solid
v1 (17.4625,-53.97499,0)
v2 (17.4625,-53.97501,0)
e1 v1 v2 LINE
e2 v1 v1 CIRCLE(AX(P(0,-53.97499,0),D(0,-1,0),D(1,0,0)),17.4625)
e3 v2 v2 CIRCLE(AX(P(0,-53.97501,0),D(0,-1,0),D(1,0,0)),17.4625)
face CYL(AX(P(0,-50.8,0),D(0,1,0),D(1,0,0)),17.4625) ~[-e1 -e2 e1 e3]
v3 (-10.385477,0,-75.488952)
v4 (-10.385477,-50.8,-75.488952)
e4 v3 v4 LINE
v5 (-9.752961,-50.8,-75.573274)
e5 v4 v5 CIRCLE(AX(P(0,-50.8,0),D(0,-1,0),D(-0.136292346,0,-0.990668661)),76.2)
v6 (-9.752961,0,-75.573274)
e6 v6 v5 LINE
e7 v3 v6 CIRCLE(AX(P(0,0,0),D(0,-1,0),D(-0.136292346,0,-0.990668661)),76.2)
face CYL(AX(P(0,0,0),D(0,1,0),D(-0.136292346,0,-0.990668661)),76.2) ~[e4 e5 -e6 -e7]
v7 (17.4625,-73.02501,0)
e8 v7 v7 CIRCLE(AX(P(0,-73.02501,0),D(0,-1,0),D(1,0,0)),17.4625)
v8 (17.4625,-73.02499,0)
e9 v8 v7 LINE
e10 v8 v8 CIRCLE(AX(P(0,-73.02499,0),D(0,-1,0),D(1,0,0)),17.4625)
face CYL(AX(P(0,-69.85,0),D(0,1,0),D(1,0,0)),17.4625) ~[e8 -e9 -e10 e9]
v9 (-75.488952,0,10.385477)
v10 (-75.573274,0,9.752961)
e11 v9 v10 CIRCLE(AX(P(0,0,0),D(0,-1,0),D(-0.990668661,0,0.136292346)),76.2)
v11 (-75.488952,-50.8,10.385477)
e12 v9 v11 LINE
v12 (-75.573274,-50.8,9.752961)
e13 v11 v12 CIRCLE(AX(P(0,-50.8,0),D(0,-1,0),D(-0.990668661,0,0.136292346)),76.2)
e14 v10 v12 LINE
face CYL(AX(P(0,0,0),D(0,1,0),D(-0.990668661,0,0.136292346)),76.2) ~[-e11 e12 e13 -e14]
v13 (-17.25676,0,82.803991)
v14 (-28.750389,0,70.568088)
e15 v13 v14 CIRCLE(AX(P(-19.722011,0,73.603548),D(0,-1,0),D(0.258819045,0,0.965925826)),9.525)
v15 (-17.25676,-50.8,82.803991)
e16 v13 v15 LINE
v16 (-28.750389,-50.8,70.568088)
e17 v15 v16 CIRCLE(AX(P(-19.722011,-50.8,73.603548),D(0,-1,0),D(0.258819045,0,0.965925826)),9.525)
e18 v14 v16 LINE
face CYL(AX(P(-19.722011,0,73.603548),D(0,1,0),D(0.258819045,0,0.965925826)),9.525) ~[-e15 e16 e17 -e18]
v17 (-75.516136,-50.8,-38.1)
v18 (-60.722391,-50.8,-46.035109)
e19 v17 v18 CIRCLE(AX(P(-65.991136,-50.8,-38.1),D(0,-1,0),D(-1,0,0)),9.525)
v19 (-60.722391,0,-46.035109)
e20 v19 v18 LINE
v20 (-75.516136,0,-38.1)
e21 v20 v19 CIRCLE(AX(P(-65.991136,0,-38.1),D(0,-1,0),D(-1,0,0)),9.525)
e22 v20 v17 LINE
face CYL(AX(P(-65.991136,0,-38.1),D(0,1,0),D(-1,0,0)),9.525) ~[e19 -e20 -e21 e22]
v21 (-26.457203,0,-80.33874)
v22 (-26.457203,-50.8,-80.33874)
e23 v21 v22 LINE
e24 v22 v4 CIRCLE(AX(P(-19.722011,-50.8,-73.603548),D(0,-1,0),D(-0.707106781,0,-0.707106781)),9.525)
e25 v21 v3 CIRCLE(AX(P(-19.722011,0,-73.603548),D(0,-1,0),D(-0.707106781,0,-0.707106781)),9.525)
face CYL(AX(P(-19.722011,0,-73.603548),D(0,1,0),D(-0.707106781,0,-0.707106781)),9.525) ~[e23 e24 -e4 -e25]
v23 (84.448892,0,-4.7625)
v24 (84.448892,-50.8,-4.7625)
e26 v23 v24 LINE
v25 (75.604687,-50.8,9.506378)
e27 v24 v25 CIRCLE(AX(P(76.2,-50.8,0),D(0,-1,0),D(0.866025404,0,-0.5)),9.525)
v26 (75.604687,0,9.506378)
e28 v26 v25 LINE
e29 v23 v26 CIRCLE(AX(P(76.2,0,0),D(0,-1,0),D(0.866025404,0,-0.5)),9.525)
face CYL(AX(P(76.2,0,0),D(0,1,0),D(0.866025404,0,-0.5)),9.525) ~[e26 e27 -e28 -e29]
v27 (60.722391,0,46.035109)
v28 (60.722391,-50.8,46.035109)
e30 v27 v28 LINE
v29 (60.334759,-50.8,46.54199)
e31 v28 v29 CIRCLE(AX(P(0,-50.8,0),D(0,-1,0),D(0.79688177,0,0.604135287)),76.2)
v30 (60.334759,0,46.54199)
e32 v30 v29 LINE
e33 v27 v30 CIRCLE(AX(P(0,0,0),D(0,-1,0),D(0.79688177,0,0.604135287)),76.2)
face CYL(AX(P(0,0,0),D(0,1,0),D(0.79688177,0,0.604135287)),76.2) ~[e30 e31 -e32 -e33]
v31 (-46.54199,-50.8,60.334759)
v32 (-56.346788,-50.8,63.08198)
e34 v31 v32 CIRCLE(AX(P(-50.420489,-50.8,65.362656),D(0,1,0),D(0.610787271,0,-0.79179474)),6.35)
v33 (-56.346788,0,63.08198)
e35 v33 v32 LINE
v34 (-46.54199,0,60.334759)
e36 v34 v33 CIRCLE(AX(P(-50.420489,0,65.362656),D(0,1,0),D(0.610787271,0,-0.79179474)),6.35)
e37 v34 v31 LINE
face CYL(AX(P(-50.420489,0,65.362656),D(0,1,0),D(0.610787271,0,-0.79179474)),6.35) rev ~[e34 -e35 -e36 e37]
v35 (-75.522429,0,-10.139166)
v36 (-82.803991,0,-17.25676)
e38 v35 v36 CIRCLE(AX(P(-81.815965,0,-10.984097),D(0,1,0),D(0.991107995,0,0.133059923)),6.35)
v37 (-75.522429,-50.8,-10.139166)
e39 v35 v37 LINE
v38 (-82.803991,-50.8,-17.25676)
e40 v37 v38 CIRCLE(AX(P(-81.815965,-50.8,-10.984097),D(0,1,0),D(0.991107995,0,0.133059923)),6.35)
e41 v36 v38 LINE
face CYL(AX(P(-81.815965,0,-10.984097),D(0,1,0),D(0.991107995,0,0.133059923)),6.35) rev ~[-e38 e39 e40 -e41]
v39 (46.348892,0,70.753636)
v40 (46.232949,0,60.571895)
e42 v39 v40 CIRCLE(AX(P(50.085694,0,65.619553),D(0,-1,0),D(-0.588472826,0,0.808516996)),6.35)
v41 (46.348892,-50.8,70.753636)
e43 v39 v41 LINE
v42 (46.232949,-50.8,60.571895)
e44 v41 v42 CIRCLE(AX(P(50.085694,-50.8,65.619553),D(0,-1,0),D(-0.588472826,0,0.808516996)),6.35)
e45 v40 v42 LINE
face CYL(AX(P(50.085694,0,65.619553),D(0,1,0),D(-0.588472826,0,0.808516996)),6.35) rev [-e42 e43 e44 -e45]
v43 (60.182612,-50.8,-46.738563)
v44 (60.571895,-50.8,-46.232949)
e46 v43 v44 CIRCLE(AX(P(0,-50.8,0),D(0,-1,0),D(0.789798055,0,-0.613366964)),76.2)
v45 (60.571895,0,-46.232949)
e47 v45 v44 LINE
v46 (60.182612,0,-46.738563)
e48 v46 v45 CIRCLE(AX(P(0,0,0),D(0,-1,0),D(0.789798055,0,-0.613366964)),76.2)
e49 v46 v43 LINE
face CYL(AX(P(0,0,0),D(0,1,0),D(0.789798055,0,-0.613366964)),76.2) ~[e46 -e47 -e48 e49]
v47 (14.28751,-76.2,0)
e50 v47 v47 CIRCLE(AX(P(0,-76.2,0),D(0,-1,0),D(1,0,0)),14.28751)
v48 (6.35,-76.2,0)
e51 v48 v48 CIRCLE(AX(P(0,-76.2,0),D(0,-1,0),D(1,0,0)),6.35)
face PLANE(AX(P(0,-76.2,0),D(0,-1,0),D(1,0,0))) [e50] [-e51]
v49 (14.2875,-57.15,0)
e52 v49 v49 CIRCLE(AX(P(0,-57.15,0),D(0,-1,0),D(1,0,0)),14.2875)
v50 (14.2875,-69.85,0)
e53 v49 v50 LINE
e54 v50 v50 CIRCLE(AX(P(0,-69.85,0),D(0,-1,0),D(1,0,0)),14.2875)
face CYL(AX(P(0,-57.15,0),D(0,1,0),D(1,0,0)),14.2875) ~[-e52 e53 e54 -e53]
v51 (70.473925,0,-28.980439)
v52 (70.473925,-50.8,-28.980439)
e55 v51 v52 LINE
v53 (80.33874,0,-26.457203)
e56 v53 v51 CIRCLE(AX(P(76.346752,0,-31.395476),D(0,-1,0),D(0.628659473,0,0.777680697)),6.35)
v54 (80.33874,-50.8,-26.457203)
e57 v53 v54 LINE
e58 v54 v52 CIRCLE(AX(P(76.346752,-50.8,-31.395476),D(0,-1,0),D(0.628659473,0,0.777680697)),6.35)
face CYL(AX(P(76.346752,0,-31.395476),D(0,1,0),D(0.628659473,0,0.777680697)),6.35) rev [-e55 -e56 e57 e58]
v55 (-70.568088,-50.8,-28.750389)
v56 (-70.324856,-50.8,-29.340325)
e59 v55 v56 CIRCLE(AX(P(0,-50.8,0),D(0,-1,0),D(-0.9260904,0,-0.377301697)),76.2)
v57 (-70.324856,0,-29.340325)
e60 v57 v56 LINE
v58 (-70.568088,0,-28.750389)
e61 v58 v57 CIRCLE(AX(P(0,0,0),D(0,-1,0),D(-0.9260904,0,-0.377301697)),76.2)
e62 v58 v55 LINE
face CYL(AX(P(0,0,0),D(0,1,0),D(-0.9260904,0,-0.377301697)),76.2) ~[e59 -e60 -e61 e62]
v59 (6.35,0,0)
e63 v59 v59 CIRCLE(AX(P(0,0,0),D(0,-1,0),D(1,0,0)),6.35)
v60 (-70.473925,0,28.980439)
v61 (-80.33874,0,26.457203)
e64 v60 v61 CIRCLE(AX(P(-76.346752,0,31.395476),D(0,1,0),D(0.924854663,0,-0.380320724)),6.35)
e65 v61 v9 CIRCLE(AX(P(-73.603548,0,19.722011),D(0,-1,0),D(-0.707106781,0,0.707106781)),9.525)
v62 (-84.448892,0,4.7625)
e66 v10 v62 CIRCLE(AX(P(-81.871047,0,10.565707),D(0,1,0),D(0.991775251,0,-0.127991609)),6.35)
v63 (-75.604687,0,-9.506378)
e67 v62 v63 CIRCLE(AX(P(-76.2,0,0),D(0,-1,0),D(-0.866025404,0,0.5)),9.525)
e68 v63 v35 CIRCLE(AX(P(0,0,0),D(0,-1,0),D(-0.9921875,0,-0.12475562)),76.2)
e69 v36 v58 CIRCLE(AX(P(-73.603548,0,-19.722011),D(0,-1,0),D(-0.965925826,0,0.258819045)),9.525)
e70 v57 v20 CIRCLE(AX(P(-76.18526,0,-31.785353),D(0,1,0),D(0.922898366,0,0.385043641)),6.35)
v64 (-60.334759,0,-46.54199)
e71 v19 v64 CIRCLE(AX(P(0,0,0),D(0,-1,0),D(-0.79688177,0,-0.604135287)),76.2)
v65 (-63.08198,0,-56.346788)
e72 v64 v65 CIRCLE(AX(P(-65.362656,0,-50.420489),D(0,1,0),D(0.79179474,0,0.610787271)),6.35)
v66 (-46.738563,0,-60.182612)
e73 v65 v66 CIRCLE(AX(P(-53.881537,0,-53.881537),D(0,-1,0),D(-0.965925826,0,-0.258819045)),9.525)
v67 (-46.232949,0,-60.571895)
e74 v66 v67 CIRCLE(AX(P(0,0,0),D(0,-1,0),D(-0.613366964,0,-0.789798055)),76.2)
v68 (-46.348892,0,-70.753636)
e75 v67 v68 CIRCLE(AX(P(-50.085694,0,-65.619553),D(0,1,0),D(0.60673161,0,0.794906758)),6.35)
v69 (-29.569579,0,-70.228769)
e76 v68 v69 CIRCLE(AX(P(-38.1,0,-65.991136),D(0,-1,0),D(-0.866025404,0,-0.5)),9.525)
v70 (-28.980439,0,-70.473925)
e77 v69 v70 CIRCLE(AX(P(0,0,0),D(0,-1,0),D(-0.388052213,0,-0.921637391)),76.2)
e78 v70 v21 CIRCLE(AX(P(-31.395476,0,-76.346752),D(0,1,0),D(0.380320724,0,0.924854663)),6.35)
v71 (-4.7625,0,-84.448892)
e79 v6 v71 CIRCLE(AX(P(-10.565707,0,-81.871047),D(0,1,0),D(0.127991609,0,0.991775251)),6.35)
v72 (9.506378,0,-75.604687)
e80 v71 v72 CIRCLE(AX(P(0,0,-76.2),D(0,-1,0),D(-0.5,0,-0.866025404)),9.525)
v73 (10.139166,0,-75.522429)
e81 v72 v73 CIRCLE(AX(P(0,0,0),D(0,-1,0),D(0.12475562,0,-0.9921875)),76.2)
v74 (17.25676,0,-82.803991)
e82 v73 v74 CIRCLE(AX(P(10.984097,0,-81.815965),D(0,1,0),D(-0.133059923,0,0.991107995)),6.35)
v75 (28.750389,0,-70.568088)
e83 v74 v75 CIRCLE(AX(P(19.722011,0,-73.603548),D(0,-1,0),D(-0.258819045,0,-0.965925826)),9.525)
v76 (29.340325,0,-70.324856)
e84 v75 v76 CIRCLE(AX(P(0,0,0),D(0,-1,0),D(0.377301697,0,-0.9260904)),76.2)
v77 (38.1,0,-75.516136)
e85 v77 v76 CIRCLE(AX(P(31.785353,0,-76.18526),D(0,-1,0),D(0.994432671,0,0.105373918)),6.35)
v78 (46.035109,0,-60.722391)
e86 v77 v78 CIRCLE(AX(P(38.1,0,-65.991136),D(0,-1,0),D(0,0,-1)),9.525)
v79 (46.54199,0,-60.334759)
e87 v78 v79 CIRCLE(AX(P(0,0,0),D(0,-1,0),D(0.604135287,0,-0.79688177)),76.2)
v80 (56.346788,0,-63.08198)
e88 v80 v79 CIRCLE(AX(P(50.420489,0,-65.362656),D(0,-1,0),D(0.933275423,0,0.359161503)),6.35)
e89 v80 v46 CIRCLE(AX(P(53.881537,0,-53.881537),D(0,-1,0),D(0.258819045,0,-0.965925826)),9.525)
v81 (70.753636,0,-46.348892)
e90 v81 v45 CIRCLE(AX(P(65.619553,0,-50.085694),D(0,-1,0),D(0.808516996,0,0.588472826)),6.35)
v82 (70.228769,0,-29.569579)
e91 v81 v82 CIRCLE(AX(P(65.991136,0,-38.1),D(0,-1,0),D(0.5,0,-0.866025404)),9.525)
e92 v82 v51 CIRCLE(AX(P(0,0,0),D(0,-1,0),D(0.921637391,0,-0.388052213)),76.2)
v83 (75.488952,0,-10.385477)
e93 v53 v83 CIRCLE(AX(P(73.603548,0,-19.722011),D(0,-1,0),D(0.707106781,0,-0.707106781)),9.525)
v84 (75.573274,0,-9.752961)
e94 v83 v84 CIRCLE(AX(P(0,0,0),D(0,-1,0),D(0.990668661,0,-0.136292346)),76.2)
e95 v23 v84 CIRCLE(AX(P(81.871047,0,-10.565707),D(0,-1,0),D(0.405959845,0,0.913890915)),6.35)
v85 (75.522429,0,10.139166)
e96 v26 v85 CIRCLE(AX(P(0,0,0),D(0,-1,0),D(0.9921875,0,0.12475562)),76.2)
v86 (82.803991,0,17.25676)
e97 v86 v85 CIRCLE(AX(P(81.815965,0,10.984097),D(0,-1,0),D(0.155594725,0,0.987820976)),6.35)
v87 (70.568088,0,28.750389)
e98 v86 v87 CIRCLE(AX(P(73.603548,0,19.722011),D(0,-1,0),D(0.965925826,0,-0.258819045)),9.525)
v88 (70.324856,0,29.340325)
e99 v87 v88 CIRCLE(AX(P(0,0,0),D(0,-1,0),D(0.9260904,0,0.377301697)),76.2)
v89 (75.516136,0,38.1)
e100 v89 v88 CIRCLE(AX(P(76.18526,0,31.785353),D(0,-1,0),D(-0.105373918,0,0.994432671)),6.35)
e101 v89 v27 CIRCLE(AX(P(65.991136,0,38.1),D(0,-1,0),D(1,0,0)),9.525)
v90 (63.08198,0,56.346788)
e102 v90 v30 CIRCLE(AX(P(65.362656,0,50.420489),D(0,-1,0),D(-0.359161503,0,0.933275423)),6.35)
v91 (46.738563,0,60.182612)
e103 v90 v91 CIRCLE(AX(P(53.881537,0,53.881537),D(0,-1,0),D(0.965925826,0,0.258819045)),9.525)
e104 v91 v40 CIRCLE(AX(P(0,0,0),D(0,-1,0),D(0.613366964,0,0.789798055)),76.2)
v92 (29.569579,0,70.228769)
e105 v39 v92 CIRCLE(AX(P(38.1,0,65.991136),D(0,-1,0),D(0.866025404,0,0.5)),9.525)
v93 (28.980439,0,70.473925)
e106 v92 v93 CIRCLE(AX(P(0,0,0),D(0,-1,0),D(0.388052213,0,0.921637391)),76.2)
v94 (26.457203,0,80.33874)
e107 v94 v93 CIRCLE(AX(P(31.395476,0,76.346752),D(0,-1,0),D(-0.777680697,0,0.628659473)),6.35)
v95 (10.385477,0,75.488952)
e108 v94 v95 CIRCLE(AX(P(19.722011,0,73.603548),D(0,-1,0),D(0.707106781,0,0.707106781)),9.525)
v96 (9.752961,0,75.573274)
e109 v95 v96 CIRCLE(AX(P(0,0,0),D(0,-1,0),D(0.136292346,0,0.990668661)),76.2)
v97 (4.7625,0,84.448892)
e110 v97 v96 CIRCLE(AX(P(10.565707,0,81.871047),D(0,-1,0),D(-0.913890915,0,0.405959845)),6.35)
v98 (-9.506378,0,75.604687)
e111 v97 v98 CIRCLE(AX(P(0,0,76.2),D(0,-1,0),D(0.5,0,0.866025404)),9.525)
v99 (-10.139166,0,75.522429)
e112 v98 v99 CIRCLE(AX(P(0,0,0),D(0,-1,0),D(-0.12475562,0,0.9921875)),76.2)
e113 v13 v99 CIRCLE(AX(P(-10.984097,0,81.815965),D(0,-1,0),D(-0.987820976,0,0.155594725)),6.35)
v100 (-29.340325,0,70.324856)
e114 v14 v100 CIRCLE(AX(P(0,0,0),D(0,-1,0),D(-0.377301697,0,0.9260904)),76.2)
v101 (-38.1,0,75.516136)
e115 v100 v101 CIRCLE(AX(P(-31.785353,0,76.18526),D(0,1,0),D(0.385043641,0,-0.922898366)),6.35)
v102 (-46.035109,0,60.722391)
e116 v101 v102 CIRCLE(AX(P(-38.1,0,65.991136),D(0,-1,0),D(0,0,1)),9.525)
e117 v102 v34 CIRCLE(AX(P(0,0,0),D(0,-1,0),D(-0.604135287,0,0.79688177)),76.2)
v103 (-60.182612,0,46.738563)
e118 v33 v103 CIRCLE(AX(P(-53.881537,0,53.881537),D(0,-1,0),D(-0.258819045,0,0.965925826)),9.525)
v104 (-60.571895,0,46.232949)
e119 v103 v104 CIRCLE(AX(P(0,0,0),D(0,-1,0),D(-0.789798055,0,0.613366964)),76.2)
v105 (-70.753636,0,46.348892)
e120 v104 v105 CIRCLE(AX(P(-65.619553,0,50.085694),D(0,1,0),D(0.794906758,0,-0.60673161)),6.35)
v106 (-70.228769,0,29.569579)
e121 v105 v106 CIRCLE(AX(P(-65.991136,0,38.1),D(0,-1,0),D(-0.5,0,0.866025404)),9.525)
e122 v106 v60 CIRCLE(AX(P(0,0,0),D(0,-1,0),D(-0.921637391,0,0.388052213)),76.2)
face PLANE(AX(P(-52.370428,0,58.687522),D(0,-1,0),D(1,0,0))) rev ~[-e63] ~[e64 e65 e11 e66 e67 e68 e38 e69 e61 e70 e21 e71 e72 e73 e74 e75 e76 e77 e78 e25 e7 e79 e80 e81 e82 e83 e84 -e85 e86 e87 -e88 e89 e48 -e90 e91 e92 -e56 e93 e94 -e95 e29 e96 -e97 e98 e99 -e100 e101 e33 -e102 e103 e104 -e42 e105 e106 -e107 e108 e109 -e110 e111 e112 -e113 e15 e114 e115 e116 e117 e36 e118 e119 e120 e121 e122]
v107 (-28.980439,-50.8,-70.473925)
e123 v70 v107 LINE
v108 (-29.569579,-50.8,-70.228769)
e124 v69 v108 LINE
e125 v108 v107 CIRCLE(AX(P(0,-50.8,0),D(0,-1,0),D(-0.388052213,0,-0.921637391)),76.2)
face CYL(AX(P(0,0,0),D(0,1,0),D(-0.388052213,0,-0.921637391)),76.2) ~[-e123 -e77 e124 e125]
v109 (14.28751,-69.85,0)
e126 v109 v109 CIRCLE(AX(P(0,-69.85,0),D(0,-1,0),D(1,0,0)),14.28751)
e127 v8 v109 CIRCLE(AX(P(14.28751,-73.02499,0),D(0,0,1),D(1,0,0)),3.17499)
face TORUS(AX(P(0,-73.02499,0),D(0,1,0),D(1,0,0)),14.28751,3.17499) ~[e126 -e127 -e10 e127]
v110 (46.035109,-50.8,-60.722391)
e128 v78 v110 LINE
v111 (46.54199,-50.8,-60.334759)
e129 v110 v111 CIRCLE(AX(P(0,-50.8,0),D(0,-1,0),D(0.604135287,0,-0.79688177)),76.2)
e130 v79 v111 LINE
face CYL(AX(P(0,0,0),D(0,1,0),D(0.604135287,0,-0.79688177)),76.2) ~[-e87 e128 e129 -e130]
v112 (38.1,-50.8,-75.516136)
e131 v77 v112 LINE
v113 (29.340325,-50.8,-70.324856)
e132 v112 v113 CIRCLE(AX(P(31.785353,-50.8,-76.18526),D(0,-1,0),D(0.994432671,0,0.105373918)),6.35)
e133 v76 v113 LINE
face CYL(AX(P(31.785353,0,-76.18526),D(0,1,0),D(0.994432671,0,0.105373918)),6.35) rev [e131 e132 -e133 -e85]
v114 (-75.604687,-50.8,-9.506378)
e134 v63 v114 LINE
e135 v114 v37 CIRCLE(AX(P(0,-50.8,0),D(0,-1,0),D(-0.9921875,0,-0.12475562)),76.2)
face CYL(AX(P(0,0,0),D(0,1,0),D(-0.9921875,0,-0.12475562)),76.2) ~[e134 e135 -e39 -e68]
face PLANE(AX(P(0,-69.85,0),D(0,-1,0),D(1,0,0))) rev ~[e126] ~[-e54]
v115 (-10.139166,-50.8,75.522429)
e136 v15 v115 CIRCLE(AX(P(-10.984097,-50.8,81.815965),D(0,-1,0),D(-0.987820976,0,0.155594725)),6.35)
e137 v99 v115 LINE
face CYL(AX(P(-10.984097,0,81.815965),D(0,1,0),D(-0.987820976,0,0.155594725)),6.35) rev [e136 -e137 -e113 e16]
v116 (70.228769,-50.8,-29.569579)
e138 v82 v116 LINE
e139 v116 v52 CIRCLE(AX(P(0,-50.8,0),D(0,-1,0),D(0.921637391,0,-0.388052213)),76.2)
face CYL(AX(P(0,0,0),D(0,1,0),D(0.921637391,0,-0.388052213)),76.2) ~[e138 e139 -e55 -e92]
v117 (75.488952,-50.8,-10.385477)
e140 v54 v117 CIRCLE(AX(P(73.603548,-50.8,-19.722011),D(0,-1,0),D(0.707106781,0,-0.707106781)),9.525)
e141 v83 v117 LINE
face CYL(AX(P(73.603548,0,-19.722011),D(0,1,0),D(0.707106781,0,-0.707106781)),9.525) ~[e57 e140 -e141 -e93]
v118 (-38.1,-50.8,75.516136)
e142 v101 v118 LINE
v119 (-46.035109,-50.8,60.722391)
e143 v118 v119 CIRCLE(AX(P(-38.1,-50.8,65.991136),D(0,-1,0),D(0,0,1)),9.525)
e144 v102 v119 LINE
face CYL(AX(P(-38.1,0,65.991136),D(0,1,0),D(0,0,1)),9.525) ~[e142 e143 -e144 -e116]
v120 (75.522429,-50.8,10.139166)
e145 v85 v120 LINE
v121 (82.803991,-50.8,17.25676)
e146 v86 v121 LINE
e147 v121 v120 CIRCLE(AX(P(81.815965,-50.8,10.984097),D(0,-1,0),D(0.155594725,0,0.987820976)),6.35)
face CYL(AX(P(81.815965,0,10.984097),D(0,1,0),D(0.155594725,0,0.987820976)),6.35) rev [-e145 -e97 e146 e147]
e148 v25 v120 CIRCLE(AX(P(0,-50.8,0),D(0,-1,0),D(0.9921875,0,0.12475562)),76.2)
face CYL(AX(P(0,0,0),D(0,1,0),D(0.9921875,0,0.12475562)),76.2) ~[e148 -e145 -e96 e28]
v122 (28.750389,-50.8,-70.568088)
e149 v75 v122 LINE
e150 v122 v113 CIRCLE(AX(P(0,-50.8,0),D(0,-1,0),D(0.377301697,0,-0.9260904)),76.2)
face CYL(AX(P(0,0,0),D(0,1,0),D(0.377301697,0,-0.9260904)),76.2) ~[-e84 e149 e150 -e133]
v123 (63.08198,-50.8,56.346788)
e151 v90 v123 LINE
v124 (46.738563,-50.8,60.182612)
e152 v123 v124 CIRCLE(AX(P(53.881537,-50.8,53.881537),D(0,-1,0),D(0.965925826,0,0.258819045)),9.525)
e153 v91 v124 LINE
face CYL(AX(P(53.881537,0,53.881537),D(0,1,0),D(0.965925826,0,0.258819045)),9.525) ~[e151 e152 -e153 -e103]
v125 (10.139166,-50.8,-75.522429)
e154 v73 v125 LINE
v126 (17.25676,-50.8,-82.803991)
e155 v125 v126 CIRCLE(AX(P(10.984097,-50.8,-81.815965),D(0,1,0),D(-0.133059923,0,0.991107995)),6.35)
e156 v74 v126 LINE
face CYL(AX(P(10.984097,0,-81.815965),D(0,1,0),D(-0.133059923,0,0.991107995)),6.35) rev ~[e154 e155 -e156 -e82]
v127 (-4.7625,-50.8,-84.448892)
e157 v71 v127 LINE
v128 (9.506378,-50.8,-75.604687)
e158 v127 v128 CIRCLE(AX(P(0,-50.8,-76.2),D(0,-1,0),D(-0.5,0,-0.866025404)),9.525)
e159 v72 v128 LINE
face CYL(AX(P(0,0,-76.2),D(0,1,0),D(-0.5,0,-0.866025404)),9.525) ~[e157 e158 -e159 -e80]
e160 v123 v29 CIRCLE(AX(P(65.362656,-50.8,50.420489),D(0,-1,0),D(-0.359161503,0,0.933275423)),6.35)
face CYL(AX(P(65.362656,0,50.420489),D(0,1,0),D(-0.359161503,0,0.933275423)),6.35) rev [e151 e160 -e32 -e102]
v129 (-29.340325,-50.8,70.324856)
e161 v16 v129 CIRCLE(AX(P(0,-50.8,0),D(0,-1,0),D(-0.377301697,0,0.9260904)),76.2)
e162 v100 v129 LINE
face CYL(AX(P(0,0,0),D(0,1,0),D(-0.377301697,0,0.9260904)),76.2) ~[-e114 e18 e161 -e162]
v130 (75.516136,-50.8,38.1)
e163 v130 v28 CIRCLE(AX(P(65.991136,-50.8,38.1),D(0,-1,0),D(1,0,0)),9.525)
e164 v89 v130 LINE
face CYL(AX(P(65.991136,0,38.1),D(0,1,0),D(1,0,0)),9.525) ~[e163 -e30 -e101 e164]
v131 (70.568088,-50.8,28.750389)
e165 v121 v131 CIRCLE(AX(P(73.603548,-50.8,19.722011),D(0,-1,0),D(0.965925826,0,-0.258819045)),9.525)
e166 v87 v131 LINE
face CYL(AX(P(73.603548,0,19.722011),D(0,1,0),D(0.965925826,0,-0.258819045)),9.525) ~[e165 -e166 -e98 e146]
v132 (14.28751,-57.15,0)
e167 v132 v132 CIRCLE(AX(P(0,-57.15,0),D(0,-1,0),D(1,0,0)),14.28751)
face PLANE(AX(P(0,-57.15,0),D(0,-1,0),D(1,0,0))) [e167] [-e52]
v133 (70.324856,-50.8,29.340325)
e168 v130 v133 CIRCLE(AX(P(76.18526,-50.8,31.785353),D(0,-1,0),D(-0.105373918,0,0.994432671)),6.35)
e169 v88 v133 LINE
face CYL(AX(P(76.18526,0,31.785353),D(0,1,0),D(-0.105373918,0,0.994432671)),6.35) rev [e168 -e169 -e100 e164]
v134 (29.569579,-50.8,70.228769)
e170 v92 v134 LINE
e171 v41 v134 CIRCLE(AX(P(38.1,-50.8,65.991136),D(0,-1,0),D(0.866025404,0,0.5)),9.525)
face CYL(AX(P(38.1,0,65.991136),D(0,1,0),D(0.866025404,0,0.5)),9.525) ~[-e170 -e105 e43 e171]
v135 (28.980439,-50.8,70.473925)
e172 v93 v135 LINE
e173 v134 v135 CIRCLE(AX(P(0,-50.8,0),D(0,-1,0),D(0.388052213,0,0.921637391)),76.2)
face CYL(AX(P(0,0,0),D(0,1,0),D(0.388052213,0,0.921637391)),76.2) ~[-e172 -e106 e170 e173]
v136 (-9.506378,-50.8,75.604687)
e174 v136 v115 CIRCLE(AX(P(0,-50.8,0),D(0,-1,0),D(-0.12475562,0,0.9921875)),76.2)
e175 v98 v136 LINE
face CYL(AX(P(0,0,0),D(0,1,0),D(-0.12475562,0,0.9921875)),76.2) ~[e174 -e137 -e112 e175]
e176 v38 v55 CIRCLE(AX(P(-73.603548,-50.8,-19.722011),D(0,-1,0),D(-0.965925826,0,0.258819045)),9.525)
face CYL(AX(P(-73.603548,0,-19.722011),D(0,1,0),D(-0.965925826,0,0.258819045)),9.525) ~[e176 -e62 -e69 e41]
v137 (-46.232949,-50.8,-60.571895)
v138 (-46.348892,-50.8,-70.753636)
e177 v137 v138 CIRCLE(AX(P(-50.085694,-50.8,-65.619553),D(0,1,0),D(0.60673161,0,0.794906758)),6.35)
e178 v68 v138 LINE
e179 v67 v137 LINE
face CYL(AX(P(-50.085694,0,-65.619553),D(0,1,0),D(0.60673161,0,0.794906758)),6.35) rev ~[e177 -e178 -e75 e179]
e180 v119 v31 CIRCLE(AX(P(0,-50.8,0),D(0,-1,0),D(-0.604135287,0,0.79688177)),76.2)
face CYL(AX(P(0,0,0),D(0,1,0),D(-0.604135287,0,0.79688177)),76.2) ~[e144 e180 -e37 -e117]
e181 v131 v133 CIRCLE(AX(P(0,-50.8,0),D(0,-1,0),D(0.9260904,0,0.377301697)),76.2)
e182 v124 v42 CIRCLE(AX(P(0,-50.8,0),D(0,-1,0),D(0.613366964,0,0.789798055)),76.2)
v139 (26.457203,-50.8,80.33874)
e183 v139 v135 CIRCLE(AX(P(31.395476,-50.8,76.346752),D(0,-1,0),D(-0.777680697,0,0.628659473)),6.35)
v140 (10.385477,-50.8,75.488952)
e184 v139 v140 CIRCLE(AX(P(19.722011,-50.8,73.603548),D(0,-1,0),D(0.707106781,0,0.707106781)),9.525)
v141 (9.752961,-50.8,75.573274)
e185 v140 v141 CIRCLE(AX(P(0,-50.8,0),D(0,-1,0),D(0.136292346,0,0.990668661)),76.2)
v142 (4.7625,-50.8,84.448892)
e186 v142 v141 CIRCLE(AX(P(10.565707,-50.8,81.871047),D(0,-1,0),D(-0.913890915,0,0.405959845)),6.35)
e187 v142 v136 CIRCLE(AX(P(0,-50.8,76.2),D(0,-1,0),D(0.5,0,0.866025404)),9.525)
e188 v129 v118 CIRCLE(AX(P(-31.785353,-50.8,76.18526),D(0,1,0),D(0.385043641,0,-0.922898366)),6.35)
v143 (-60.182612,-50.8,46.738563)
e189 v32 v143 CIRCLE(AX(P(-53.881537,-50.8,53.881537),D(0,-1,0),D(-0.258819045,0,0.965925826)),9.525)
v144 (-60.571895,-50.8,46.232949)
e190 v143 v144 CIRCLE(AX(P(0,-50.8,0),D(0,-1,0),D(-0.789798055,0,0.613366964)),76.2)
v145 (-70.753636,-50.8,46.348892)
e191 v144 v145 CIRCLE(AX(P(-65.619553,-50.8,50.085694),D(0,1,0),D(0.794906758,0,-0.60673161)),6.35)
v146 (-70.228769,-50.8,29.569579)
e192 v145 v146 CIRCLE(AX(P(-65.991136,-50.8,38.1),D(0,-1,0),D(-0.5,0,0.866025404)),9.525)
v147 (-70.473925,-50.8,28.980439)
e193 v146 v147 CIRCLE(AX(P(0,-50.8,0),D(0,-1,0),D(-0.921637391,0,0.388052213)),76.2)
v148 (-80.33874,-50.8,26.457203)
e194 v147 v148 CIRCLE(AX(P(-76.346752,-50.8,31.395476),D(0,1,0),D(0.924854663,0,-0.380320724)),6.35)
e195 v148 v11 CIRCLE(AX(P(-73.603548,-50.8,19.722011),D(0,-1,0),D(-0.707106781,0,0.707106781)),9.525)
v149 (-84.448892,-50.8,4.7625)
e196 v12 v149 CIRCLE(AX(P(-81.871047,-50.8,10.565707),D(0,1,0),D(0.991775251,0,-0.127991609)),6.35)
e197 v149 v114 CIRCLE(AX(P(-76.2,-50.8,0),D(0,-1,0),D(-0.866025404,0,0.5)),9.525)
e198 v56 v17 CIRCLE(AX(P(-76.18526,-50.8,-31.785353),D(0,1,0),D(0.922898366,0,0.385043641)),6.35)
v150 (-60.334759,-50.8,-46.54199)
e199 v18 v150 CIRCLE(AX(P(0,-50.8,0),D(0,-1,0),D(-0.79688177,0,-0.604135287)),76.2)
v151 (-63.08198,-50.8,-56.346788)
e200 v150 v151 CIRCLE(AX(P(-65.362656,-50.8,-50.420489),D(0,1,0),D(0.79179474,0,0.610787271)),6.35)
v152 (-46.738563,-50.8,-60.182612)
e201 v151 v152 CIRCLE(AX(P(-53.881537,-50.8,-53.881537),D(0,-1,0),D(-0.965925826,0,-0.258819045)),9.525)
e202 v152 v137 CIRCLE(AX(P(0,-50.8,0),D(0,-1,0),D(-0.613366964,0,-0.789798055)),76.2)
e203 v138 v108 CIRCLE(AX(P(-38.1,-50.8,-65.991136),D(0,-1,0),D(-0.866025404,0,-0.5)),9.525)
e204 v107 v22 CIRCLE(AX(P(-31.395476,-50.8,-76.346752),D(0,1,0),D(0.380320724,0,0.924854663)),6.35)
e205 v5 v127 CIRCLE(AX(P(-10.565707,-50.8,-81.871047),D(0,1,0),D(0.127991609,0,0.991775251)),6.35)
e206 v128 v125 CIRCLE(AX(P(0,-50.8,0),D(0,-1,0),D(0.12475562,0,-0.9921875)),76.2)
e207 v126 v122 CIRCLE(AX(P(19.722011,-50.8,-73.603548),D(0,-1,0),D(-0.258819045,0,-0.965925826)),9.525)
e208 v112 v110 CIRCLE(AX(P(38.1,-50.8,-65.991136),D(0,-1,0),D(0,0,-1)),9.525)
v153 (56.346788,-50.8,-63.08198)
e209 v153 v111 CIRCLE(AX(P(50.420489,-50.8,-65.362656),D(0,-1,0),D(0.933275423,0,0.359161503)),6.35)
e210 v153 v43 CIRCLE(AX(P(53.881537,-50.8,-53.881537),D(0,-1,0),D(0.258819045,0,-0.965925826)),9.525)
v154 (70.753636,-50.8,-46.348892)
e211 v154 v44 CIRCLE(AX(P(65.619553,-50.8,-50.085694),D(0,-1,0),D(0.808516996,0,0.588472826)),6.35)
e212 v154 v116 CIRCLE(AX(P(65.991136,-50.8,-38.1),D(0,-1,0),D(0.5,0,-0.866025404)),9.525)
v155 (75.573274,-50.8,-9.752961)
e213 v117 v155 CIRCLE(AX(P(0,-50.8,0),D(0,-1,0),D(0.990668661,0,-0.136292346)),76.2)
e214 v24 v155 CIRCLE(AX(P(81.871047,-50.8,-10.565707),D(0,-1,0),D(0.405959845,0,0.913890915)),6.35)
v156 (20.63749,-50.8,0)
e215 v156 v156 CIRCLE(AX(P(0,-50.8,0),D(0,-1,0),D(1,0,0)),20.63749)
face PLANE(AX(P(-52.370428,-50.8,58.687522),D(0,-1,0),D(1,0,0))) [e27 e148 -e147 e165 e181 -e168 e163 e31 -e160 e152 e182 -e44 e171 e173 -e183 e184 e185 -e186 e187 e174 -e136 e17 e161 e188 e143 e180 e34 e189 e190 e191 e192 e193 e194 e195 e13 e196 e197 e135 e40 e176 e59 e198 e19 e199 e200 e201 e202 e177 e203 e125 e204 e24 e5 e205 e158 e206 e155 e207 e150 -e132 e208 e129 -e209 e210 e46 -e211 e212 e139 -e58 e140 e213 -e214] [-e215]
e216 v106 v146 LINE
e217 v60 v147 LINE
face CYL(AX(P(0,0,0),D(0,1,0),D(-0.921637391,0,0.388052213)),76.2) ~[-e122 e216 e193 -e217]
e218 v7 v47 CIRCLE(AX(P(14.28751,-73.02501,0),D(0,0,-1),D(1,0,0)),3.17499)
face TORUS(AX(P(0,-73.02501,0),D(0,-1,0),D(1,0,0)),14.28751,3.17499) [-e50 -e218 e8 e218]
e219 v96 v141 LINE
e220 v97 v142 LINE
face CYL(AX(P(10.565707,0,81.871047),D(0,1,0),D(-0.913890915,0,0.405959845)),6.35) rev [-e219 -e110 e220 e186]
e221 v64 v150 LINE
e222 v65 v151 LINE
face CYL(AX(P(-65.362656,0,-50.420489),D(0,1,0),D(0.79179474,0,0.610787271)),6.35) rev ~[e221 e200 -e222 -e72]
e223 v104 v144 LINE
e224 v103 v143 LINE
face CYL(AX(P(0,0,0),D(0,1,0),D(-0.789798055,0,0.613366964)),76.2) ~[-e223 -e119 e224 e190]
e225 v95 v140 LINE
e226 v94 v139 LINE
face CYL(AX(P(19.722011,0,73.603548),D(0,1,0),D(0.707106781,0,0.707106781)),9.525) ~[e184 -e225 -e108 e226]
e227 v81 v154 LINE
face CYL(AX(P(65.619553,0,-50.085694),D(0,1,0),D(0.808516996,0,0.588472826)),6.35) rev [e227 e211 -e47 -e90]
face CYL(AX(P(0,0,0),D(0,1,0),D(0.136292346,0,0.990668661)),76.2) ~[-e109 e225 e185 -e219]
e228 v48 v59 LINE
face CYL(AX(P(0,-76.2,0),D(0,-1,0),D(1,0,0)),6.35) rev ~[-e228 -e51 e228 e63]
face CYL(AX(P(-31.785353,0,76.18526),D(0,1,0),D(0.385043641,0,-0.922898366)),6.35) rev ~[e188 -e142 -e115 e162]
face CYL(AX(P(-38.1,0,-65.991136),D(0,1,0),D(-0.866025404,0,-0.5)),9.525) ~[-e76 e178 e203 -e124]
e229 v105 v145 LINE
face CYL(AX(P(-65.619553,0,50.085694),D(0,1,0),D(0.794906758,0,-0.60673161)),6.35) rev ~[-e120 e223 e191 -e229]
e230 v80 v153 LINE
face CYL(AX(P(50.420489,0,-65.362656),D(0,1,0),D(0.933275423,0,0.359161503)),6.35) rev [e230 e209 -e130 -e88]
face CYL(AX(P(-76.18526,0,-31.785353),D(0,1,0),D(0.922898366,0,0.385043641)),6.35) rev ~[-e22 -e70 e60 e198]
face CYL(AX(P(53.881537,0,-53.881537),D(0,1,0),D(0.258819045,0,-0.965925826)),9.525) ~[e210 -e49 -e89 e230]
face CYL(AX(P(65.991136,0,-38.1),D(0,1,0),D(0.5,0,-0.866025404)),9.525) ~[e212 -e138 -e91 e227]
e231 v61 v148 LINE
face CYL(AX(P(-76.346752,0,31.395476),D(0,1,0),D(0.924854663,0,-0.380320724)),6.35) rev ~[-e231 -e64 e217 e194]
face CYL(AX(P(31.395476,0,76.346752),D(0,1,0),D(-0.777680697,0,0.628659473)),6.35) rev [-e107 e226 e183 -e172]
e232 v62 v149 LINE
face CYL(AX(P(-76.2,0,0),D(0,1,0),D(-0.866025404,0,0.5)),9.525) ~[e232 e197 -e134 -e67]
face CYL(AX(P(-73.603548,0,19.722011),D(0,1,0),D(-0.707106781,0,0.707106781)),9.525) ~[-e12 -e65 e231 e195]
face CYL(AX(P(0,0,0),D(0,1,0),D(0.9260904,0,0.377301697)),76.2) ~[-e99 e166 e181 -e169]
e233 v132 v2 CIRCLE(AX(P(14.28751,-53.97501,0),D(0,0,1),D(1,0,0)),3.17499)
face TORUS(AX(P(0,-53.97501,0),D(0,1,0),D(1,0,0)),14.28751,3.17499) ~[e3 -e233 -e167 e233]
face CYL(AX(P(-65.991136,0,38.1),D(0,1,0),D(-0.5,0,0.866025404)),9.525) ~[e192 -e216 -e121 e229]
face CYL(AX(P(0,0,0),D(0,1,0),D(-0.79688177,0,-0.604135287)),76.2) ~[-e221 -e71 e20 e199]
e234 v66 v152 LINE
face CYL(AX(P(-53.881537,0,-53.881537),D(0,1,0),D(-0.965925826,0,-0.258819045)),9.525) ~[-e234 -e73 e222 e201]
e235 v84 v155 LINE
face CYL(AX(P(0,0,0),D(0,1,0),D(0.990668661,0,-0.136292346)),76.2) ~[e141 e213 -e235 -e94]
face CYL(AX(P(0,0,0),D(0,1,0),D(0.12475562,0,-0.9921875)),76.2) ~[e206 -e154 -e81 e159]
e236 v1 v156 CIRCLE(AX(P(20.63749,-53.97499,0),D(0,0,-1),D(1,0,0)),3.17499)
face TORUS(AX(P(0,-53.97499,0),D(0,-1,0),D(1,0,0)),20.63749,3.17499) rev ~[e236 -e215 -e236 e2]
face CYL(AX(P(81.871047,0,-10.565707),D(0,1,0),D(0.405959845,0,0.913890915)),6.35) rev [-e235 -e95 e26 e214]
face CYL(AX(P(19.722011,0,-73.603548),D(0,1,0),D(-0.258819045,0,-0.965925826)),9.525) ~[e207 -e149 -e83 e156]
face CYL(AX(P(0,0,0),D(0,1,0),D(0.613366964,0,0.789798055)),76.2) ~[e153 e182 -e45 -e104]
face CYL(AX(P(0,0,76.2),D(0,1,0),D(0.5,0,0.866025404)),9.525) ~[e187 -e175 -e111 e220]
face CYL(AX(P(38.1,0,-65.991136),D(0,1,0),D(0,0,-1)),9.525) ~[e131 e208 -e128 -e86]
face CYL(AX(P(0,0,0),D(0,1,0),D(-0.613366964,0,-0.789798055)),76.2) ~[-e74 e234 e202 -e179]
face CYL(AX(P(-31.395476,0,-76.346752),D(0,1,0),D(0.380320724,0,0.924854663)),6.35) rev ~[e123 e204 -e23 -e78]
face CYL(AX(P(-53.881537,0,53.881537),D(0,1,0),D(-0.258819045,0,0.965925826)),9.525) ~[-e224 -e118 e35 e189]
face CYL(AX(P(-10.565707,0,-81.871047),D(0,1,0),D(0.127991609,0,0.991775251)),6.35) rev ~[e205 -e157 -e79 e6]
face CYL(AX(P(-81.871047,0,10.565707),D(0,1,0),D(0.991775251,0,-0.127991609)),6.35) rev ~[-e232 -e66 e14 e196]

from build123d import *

# Parameters (mm, degrees)
F1_DEPTH     = 50.8
F2_R         = 17.4625
F3_DEPTH     = 6.35
F4_R         = 14.2875
F5_DEPTH     = 12.7
F6_R         = 17.4625
F7_DEPTH     = 6.35
F8_R         = 3.17499
F9_R         = 6.35
F10_DEPTH    = 76.201
F11_T1_DEPTH = 50.8


# Not quite as in the source:
# - a fillet or chamfer that OpenCascade refuses, or shapes differently, is made with other operations: its cross-section is extruded or revolved along the edge and cut away or added
# - a fillet or chamfer is up to 0.001 mm smaller than in the source, because OpenCascade refuses the exact size


with BuildPart() as f1:
    # F0 (on Front) → F1 (new body)
    with BuildSketch(Plane.XZ):
        with BuildLine():
            ThreePointArc((-70.7536357684, 46.348891971), (-75.5114792005, 37.8021981611), (-70.2287691608, 29.5695786604))
            ThreePointArc((-70.2287691608, 29.5695786604), (-72.0845164259, 24.7034914868), (-73.6035479632, 19.7220112368))
            Line((-73.6035479632, 19.7220112368), (-80.338740054, 26.4572033276))
            ThreePointArc((-80.338740054, 26.4572033276), (-82.7224167718, 16.9703105533), (-75.4889519939, 10.3854767276))
            ThreePointArc((-75.4889519939, 10.3854767276), (-76.0220301687, 5.2048947186), (-76.2, 0))
            Line((-76.2, 0), (-84.448891971, 4.7625))
            ThreePointArc((-84.448891971, 4.7625), (-84.2959583455, -5.0180756738), (-75.6046875, -9.5063782813))
            ThreePointArc((-75.6046875, -9.5063782813), (-74.7787681878, -14.6484070232), (-73.6035479632, -19.7220112368))
            Line((-73.6035479632, -19.7220112368), (-82.8039914586, -17.2567598322))
            ThreePointArc((-82.8039914586, -17.2567598322), (-80.1248696635, -26.6644883366), (-70.5680884956, -28.7503893204))
            ThreePointArc((-70.5680884956, -28.7503893204), (-68.4394567327, -33.503444034), (-65.9911357684, -38.1))
            Line((-65.9911357684, -38.1), (-75.5161357684, -38.1))
            ThreePointArc((-75.5161357684, -38.1), (-70.4934035266, -46.4937601844), (-60.7223908795, -46.0351088396))
            ThreePointArc((-60.7223908795, -46.0351088396), (-57.4361094027, -50.075276701), (-53.8815367264, -53.8815367264))
            Line((-53.8815367264, -53.8815367264), (-63.0819802218, -56.346788131))
            ThreePointArc((-63.0819802218, -56.346788131), (-56.0579284352, -63.1545591102), (-46.7385626735, -60.182611768))
            ThreePointArc((-46.7385626735, -60.182611768), (-42.5185861347, -63.234562014), (-38.1, -65.9911357684))
            Line((-38.1, -65.9911357684), (-46.348891971, -70.7536357684))
            ThreePointArc((-46.348891971, -70.7536357684), (-37.8021981611, -75.5114792005), (-29.5695786604, -70.2287691608))
            ThreePointArc((-29.5695786604, -70.2287691608), (-24.7034914868, -72.0845164259), (-19.7220112368, -73.6035479632))
            Line((-19.7220112368, -73.6035479632), (-26.4572033276, -80.338740054))
            ThreePointArc((-26.4572033276, -80.338740054), (-16.9703105533, -82.7224167718), (-10.3854767276, -75.4889519939))
            ThreePointArc((-10.3854767276, -75.4889519939), (-5.2048947186, -76.0220301687), (0, -76.2))
            Line((0, -76.2), (-4.7625, -84.448891971))
            ThreePointArc((-4.7625, -84.448891971), (5.0180756738, -84.2959583455), (9.5063782813, -75.6046875))
            ThreePointArc((9.5063782813, -75.6046875), (14.6484070232, -74.7787681878), (19.7220112368, -73.6035479632))
            Line((19.7220112368, -73.6035479632), (17.2567598322, -82.8039914586))
            ThreePointArc((17.2567598322, -82.8039914586), (26.6644883366, -80.1248696635), (28.7503893204, -70.5680884956))
            ThreePointArc((28.7503893204, -70.5680884956), (33.503444034, -68.4394567327), (38.1, -65.9911357684))
            Line((38.1, -65.9911357684), (38.1, -75.5161357684))
            ThreePointArc((38.1, -75.5161357684), (46.4937601844, -70.4934035266), (46.0351088396, -60.7223908795))
            ThreePointArc((46.0351088396, -60.7223908795), (50.075276701, -57.4361094027), (53.8815367264, -53.8815367264))
            Line((53.8815367264, -53.8815367264), (56.346788131, -63.0819802218))
            ThreePointArc((56.346788131, -63.0819802218), (63.1545591102, -56.0579284352), (60.182611768, -46.7385626735))
            ThreePointArc((60.182611768, -46.7385626735), (63.234562014, -42.5185861347), (65.9911357684, -38.1))
            Line((65.9911357684, -38.1), (70.7536357684, -46.348891971))
            ThreePointArc((70.7536357684, -46.348891971), (75.5114792005, -37.8021981611), (70.2287691608, -29.5695786604))
            ThreePointArc((70.2287691608, -29.5695786604), (72.0845164259, -24.7034914868), (73.6035479632, -19.7220112368))
            Line((73.6035479632, -19.7220112368), (80.338740054, -26.4572033276))
            ThreePointArc((80.338740054, -26.4572033276), (82.7224167718, -16.9703105533), (75.4889519939, -10.3854767276))
            ThreePointArc((75.4889519939, -10.3854767276), (76.0220301687, -5.2048947186), (76.2, 0))
            Line((76.2, 0), (84.448891971, -4.7625))
            ThreePointArc((84.448891971, -4.7625), (84.2959583455, 5.0180756738), (75.6046875, 9.5063782813))
            ThreePointArc((75.6046875, 9.5063782813), (74.7787681878, 14.6484070232), (73.6035479632, 19.7220112368))
            Line((73.6035479632, 19.7220112368), (82.8039914586, 17.2567598322))
            ThreePointArc((82.8039914586, 17.2567598322), (80.1248696635, 26.6644883366), (70.5680884956, 28.7503893204))
            ThreePointArc((70.5680884956, 28.7503893204), (68.4394567327, 33.503444034), (65.9911357684, 38.1))
            Line((65.9911357684, 38.1), (75.5161357684, 38.1))
            ThreePointArc((75.5161357684, 38.1), (70.4934035266, 46.4937601844), (60.7223908795, 46.0351088396))
            ThreePointArc((60.7223908795, 46.0351088396), (57.4361094027, 50.075276701), (53.8815367264, 53.8815367264))
            Line((53.8815367264, 53.8815367264), (63.0819802218, 56.346788131))
            ThreePointArc((63.0819802218, 56.346788131), (56.0579284352, 63.1545591102), (46.7385626735, 60.182611768))
            ThreePointArc((46.7385626735, 60.182611768), (42.5185861347, 63.234562014), (38.1, 65.9911357684))
            Line((38.1, 65.9911357684), (46.348891971, 70.7536357684))
            ThreePointArc((46.348891971, 70.7536357684), (37.8021981611, 75.5114792005), (29.5695786604, 70.2287691608))
            ThreePointArc((29.5695786604, 70.2287691608), (24.7034914868, 72.0845164259), (19.7220112368, 73.6035479632))
            Line((19.7220112368, 73.6035479632), (26.4572033276, 80.338740054))
            ThreePointArc((26.4572033276, 80.338740054), (16.9703105533, 82.7224167718), (10.3854767276, 75.4889519939))
            ThreePointArc((10.3854767276, 75.4889519939), (5.2048947186, 76.0220301687), (0, 76.2))
            Line((0, 76.2), (4.7625, 84.448891971))
            ThreePointArc((4.7625, 84.448891971), (-5.0180756738, 84.2959583455), (-9.5063782813, 75.6046875))
            ThreePointArc((-9.5063782813, 75.6046875), (-14.6484070232, 74.7787681878), (-19.7220112368, 73.6035479632))
            Line((-19.7220112368, 73.6035479632), (-17.2567598322, 82.8039914586))
            ThreePointArc((-17.2567598322, 82.8039914586), (-26.6644883366, 80.1248696635), (-28.7503893204, 70.5680884956))
            ThreePointArc((-28.7503893204, 70.5680884956), (-33.503444034, 68.4394567327), (-38.1, 65.9911357684))
            Line((-38.1, 65.9911357684), (-38.1, 75.5161357684))
            ThreePointArc((-38.1, 75.5161357684), (-46.4937601844, 70.4934035266), (-46.0351088396, 60.7223908795))
            ThreePointArc((-46.0351088396, 60.7223908795), (-50.075276701, 57.4361094027), (-53.8815367264, 53.8815367264))
            Line((-53.8815367264, 53.8815367264), (-56.346788131, 63.0819802218))
            ThreePointArc((-56.346788131, 63.0819802218), (-63.1545591102, 56.0579284352), (-60.182611768, 46.7385626735))
            ThreePointArc((-60.182611768, 46.7385626735), (-63.234562014, 42.5185861347), (-65.9911357684, 38.1))
            Line((-65.9911357684, 38.1), (-70.7536357684, 46.348891971))
        make_face()
    extrude(amount=F1_DEPTH)

    # F2 (on face) → F3 (join)
    with BuildSketch(Plane.XZ.offset(50.8)):
        Circle(F2_R)
    extrude(amount=F3_DEPTH)

    # F4 (on face) → F5 (join)
    with BuildSketch(Plane.XZ.offset(57.15)):
        Circle(F4_R)
    extrude(amount=F5_DEPTH)

    # F6 (on face) → F7 (join)
    with BuildSketch(Plane.XZ.offset(69.85)):
        Circle(F6_R)
    extrude(amount=F7_DEPTH)

    # F8 (radius 3.175 in the source; OpenCascade refuses exactly that, so slightly less here)
    f8_edges = [f1.edges().sort_by_distance(p)[0] for p in [
        (17.4625, -73.025, 0),
        (-17.4625, -69.85, 0),
        (-17.4625, -76.2, 0),
        (17.4625, -53.975, 0),
        (-17.4625, -50.8, 0),
        (-17.4625, -57.15, 0),
    ]]
    fillet(f8_edges, radius=F8_R)

    # F9 (on face) → F10 (cut, through all)
    with BuildSketch(Plane.XZ.offset(76.2)):
        Circle(F9_R)
    extrude(amount=-F10_DEPTH, mode=Mode.SUBTRACT)

    # F11: fillet of radius 6.35 on 24 edges, made by hand

    # F11_s2 → F11_t1 (join)
    with BuildSketch(Plane.XZ):
        with BuildLine():
            ThreePointArc((-46.5419900283, 60.3347591708), (-52.1337249794, 59.2481383586), (-56.346788131, 63.0819802218))
            Line((-56.346788131, 63.0819802218), (-56.4653141097, 63.0363667109))
            ThreePointArc((-56.4653141097, 63.0363667109), (-55.2368350087, 58.4488884554), (-54.0042093064, 53.8486667077))
            Line((-54.0042093064, 53.8486667077), (-53.7917341652, 53.7917341652))
            ThreePointArc((-53.7917341652, 53.7917341652), (-50.2314688194, 57.1305598542), (-46.4644200449, 60.2342012389))
            Line((-46.4644200449, 60.2342012389), (-46.5419900283, 60.3347591708))
        make_face()
        with BuildLine():
            ThreePointArc((-29.3403254202, 70.3248555223), (-35.0227647841, 70.7225079169), (-38.1, 75.5161357684))
            Line((-38.1, 75.5161357684), (-38.2262929492, 75.5027532808))
            ThreePointArc((-38.2262929492, 75.5027532808), (-38.227, 70.7536357684), (-38.227, 65.9911357684))
            Line((-38.227, 65.9911357684), (-38.0365, 65.8811505421))
            ThreePointArc((-38.0365, 65.8811505421), (-33.7333960774, 68.1847440274), (-29.2914248778, 70.2076474298))
            Line((-29.2914248778, 70.2076474298), (-29.3403254202, 70.3248555223))
        make_face()
        with BuildLine():
            ThreePointArc((-17.2567598322, 82.8039914586), (-15.5250610467, 77.3772554351), (-10.1391661218, 75.5224291873))
            Line((-10.1391661218, 75.5224291873), (-10.1222675116, 75.396558472))
            ThreePointArc((-10.1222675116, 75.396558472), (-14.9364481399, 74.5922505758), (-19.6891412181, 73.4808753833))
            Line((-19.6891412181, 73.4808753833), (-19.8446838168, 73.636417982))
            ThreePointArc((-19.8446838168, 73.636417982), (-18.6120581145, 78.2366397297), (-17.3822130962, 82.8237519887))
            Line((-17.3822130962, 82.8237519887), (-17.2567598322, 82.8039914586))
        make_face()
        with BuildLine():
            ThreePointArc((4.7625, 84.448891971), (5.0306499446, 78.7588708674), (9.752960592, 75.5732741099))
            Line((9.752960592, 75.5732741099), (9.7367056577, 75.4473186531))
            ThreePointArc((9.7367056577, 75.4473186531), (4.8783940547, 75.916418517), (0, 76.073))
            Line((0, 76.073), (-0.1099852263, 76.2635))
            ThreePointArc((-0.1099852263, 76.2635), (2.2712647737, 80.3879459855), (4.6464358538, 84.5004488714))
            Line((4.6464358538, 84.5004488714), (4.7625, 84.448891971))
        make_face()
        with BuildLine():
            ThreePointArc((26.4572033276, 80.338740054), (25.2435304558, 74.7731994053), (28.980439159, 70.4739252926))
            Line((28.980439159, 70.4739252926), (28.9321384271, 70.3564687505))
            ThreePointArc((28.9321384271, 70.3564687505), (24.3607817564, 72.0670079941), (19.6891412181, 73.4808753833))
            Line((19.6891412181, 73.4808753833), (19.6322086756, 73.6933505244))
            ThreePointArc((19.6322086756, 73.6933505244), (22.999804721, 77.0609465698), (26.3584378791, 80.4185798071))
            Line((26.3584378791, 80.4185798071), (26.4572033276, 80.338740054))
        make_face()
        with BuildLine():
            ThreePointArc((46.348891971, 70.7536357684), (43.7361060833, 65.6918579723), (46.2329486897, 60.5718949303))
            Line((46.2329486897, 60.5718949303), (46.1558937753, 60.4709417721))
            ThreePointArc((46.1558937753, 60.4709417721), (42.1830224396, 63.3063499727), (38.0365, 65.8811505421))
            Line((38.0365, 65.8811505421), (38.0365, 66.1011209947))
            ThreePointArc((38.0365, 66.1011209947), (42.1609459855, 68.4823709947), (46.2741559222, 70.8563174269))
            Line((46.2741559222, 70.8563174269), (46.348891971, 70.7536357684))
        make_face()
        with BuildLine():
            ThreePointArc((63.0819802218, 56.346788131), (59.2481383586, 52.1337249794), (60.3347591708, 46.5419900283))
            Line((60.3347591708, 46.5419900283), (60.2342012389, 46.4644200449))
            ThreePointArc((60.2342012389, 46.4644200449), (57.1305598542, 50.2314688194), (53.7917341652, 53.7917341652))
            Line((53.7917341652, 53.7917341652), (53.8486667077, 54.0042093064))
            ThreePointArc((53.8486667077, 54.0042093064), (58.4488884554, 55.2368350087), (63.0363667109, 56.4653141097))
            Line((63.0363667109, 56.4653141097), (63.0819802218, 56.346788131))
        make_face()
        with BuildLine():
            ThreePointArc((75.5161357684, 38.1), (70.7225079169, 35.0227647841), (70.3248555223, 29.3403254202))
            Line((70.3248555223, 29.3403254202), (70.2076474298, 29.2914248778))
            ThreePointArc((70.2076474298, 29.2914248778), (68.1847440274, 33.7333960774), (65.8811505421, 38.0365))
            Line((65.8811505421, 38.0365), (65.9911357684, 38.227))
            ThreePointArc((65.9911357684, 38.227), (70.7536357684, 38.227), (75.5027532808, 38.2262929492))
            Line((75.5027532808, 38.2262929492), (75.5161357684, 38.1))
        make_face()
        with BuildLine():
            ThreePointArc((82.8039914586, 17.2567598322), (77.3772554351, 15.5250610467), (75.5224291873, 10.1391661218))
            Line((75.5224291873, 10.1391661218), (75.396558472, 10.1222675116))
            ThreePointArc((75.396558472, 10.1222675116), (74.5922505758, 14.9364481399), (73.4808753833, 19.6891412181))
            Line((73.4808753833, 19.6891412181), (73.636417982, 19.8446838168))
            ThreePointArc((73.636417982, 19.8446838168), (78.2366397297, 18.6120581144), (82.8237519887, 17.3822130962))
            Line((82.8237519887, 17.3822130962), (82.8039914586, 17.2567598322))
        make_face()
        with BuildLine():
            ThreePointArc((84.448891971, -4.7625), (78.7588708674, -5.0306499446), (75.5732741099, -9.752960592))
            Line((75.5732741099, -9.752960592), (75.4473186531, -9.7367056577))
            ThreePointArc((75.4473186531, -9.7367056577), (75.916418517, -4.8783940547), (76.073, 0))
            Line((76.073, 0), (76.2635, 0.1099852263))
            ThreePointArc((76.2635, 0.1099852263), (80.3879459855, -2.2712647737), (84.5004488714, -4.6464358538))
            Line((84.5004488714, -4.6464358538), (84.448891971, -4.7625))
        make_face()
        with BuildLine():
            ThreePointArc((80.338740054, -26.4572033276), (74.7731994053, -25.2435304558), (70.4739252926, -28.980439159))
            Line((70.4739252926, -28.980439159), (70.3564687505, -28.9321384271))
            ThreePointArc((70.3564687505, -28.9321384271), (72.0670079941, -24.3607817564), (73.4808753833, -19.6891412181))
            Line((73.4808753833, -19.6891412181), (73.6933505244, -19.6322086756))
            ThreePointArc((73.6933505244, -19.6322086756), (77.0609465698, -22.999804721), (80.4185798071, -26.3584378791))
            Line((80.4185798071, -26.3584378791), (80.338740054, -26.4572033276))
        make_face()
        with BuildLine():
            ThreePointArc((70.7536357684, -46.348891971), (65.6918579723, -43.7361060833), (60.5718949303, -46.2329486897))
            Line((60.5718949303, -46.2329486897), (60.4709417721, -46.1558937753))
            ThreePointArc((60.4709417721, -46.1558937753), (63.3063499727, -42.1830224396), (65.8811505421, -38.0365))
            Line((65.8811505421, -38.0365), (66.1011209947, -38.0365))
            ThreePointArc((66.1011209947, -38.0365), (68.4823709947, -42.1609459855), (70.8563174269, -46.2741559222))
            Line((70.8563174269, -46.2741559222), (70.7536357684, -46.348891971))
        make_face()
        with BuildLine():
            ThreePointArc((56.346788131, -63.0819802218), (52.1337249794, -59.2481383586), (46.5419900283, -60.3347591708))
            Line((46.5419900283, -60.3347591708), (46.4644200449, -60.2342012389))
            ThreePointArc((46.4644200449, -60.2342012389), (50.2314688194, -57.1305598542), (53.7917341652, -53.7917341652))
            Line((53.7917341652, -53.7917341652), (54.0042093064, -53.8486667077))
            ThreePointArc((54.0042093064, -53.8486667077), (55.2368350087, -58.4488884554), (56.4653141097, -63.0363667109))
            Line((56.4653141097, -63.0363667109), (56.346788131, -63.0819802218))
        make_face()
        with BuildLine():
            ThreePointArc((38.1, -75.5161357684), (35.0227647841, -70.7225079169), (29.3403254202, -70.3248555223))
            Line((29.3403254202, -70.3248555223), (29.2914248778, -70.2076474298))
            ThreePointArc((29.2914248778, -70.2076474298), (33.7333960774, -68.1847440274), (38.0365, -65.8811505421))
            Line((38.0365, -65.8811505421), (38.227, -65.9911357684))
            ThreePointArc((38.227, -65.9911357684), (38.227, -70.7536357684), (38.2262929492, -75.5027532808))
            Line((38.2262929492, -75.5027532808), (38.1, -75.5161357684))
        make_face()
        with BuildLine():
            ThreePointArc((10.1391661218, -75.5224291873), (15.5250610467, -77.3772554351), (17.2567598322, -82.8039914586))
            Line((17.2567598322, -82.8039914586), (17.3822130962, -82.8237519887))
            ThreePointArc((17.3822130962, -82.8237519887), (18.6120581145, -78.2366397297), (19.8446838168, -73.636417982))
            Line((19.8446838168, -73.636417982), (19.6891412181, -73.4808753833))
            ThreePointArc((19.6891412181, -73.4808753833), (14.9364481399, -74.5922505758), (10.1222675116, -75.396558472))
            Line((10.1222675116, -75.396558472), (10.1391661218, -75.5224291873))
        make_face()
        with BuildLine():
            ThreePointArc((-9.752960592, -75.5732741099), (-5.0306499446, -78.7588708674), (-4.7625, -84.448891971))
            Line((-4.7625, -84.448891971), (-4.6464358538, -84.5004488714))
            ThreePointArc((-4.6464358538, -84.5004488714), (-2.2712647737, -80.3879459855), (0.1099852263, -76.2635))
            Line((0.1099852263, -76.2635), (0, -76.073))
            ThreePointArc((0, -76.073), (-4.8783940547, -75.916418517), (-9.7367056577, -75.4473186531))
            Line((-9.7367056577, -75.4473186531), (-9.752960592, -75.5732741099))
        make_face()
        with BuildLine():
            ThreePointArc((-28.980439159, -70.4739252926), (-25.2435304558, -74.7731994053), (-26.4572033276, -80.338740054))
            Line((-26.4572033276, -80.338740054), (-26.3584378791, -80.4185798071))
            ThreePointArc((-26.3584378791, -80.4185798071), (-22.999804721, -77.0609465698), (-19.6322086756, -73.6933505244))
            Line((-19.6322086756, -73.6933505244), (-19.6891412181, -73.4808753833))
            ThreePointArc((-19.6891412181, -73.4808753833), (-24.3607817564, -72.0670079941), (-28.9321384271, -70.3564687505))
            Line((-28.9321384271, -70.3564687505), (-28.980439159, -70.4739252926))
        make_face()
        with BuildLine():
            ThreePointArc((-46.2329486897, -60.5718949303), (-43.7361060833, -65.6918579723), (-46.348891971, -70.7536357684))
            Line((-46.348891971, -70.7536357684), (-46.2741559222, -70.8563174269))
            ThreePointArc((-46.2741559222, -70.8563174269), (-42.1609459855, -68.4823709947), (-38.0365, -66.1011209947))
            Line((-38.0365, -66.1011209947), (-38.0365, -65.8811505421))
            ThreePointArc((-38.0365, -65.8811505421), (-42.1830224396, -63.3063499727), (-46.1558937753, -60.4709417721))
            Line((-46.1558937753, -60.4709417721), (-46.2329486897, -60.5718949303))
        make_face()
        with BuildLine():
            ThreePointArc((-60.3347591708, -46.5419900283), (-59.2481383586, -52.1337249794), (-63.0819802218, -56.346788131))
            Line((-63.0819802218, -56.346788131), (-63.0363667109, -56.4653141097))
            ThreePointArc((-63.0363667109, -56.4653141097), (-58.4488884554, -55.2368350087), (-53.8486667077, -54.0042093064))
            Line((-53.8486667077, -54.0042093064), (-53.7917341652, -53.7917341652))
            ThreePointArc((-53.7917341652, -53.7917341652), (-57.1305598542, -50.2314688194), (-60.2342012389, -46.4644200449))
            Line((-60.2342012389, -46.4644200449), (-60.3347591708, -46.5419900283))
        make_face()
        with BuildLine():
            ThreePointArc((-70.3248555223, -29.3403254202), (-70.7225079169, -35.0227647841), (-75.5161357684, -38.1))
            Line((-75.5161357684, -38.1), (-75.5027532808, -38.2262929492))
            ThreePointArc((-75.5027532808, -38.2262929492), (-70.7536357684, -38.227), (-65.9911357684, -38.227))
            Line((-65.9911357684, -38.227), (-65.8811505421, -38.0365))
            ThreePointArc((-65.8811505421, -38.0365), (-68.1847440274, -33.7333960774), (-70.2076474298, -29.2914248778))
            Line((-70.2076474298, -29.2914248778), (-70.3248555223, -29.3403254202))
        make_face()
        with BuildLine():
            ThreePointArc((-75.5224291873, -10.1391661218), (-77.3772554351, -15.5250610467), (-82.8039914586, -17.2567598322))
            Line((-82.8039914586, -17.2567598322), (-82.8237519887, -17.3822130962))
            ThreePointArc((-82.8237519887, -17.3822130962), (-78.2366397297, -18.6120581145), (-73.636417982, -19.8446838168))
            Line((-73.636417982, -19.8446838168), (-73.4808753833, -19.6891412181))
            ThreePointArc((-73.4808753833, -19.6891412181), (-74.5922505758, -14.9364481399), (-75.396558472, -10.1222675116))
            Line((-75.396558472, -10.1222675116), (-75.5224291873, -10.1391661218))
        make_face()
        with BuildLine():
            ThreePointArc((-75.5732741099, 9.752960592), (-78.7588708674, 5.0306499446), (-84.448891971, 4.7625))
            Line((-84.448891971, 4.7625), (-84.5004488714, 4.6464358538))
            ThreePointArc((-84.5004488714, 4.6464358538), (-80.3879459855, 2.2712647737), (-76.2635, -0.1099852263))
            Line((-76.2635, -0.1099852263), (-76.073, 0))
            ThreePointArc((-76.073, 0), (-75.916418517, 4.8783940547), (-75.4473186531, 9.7367056577))
            Line((-75.4473186531, 9.7367056577), (-75.5732741099, 9.752960592))
        make_face()
        with BuildLine():
            ThreePointArc((-70.4739252926, 28.980439159), (-74.7731994053, 25.2435304558), (-80.338740054, 26.4572033276))
            Line((-80.338740054, 26.4572033276), (-80.4185798071, 26.3584378791))
            ThreePointArc((-80.4185798071, 26.3584378791), (-77.0609465698, 22.999804721), (-73.6933505244, 19.6322086756))
            Line((-73.6933505244, 19.6322086756), (-73.4808753833, 19.6891412181))
            ThreePointArc((-73.4808753833, 19.6891412181), (-72.0670079941, 24.3607817564), (-70.3564687505, 28.9321384271))
            Line((-70.3564687505, 28.9321384271), (-70.4739252926, 28.980439159))
        make_face()
        with BuildLine():
            ThreePointArc((-60.5718949303, 46.2329486897), (-65.6918579723, 43.7361060833), (-70.7536357684, 46.348891971))
            Line((-70.7536357684, 46.348891971), (-70.8563174269, 46.2741559222))
            ThreePointArc((-70.8563174269, 46.2741559222), (-68.4823709947, 42.1609459855), (-66.1011209947, 38.0365))
            Line((-66.1011209947, 38.0365), (-65.8811505421, 38.0365))
            ThreePointArc((-65.8811505421, 38.0365), (-63.3063499727, 42.1830224396), (-60.4709417721, 46.1558937753))
            Line((-60.4709417721, 46.1558937753), (-60.5718949303, 46.2329486897))
        make_face()
    extrude(amount=F11_T1_DEPTH)


solid = f1.part
